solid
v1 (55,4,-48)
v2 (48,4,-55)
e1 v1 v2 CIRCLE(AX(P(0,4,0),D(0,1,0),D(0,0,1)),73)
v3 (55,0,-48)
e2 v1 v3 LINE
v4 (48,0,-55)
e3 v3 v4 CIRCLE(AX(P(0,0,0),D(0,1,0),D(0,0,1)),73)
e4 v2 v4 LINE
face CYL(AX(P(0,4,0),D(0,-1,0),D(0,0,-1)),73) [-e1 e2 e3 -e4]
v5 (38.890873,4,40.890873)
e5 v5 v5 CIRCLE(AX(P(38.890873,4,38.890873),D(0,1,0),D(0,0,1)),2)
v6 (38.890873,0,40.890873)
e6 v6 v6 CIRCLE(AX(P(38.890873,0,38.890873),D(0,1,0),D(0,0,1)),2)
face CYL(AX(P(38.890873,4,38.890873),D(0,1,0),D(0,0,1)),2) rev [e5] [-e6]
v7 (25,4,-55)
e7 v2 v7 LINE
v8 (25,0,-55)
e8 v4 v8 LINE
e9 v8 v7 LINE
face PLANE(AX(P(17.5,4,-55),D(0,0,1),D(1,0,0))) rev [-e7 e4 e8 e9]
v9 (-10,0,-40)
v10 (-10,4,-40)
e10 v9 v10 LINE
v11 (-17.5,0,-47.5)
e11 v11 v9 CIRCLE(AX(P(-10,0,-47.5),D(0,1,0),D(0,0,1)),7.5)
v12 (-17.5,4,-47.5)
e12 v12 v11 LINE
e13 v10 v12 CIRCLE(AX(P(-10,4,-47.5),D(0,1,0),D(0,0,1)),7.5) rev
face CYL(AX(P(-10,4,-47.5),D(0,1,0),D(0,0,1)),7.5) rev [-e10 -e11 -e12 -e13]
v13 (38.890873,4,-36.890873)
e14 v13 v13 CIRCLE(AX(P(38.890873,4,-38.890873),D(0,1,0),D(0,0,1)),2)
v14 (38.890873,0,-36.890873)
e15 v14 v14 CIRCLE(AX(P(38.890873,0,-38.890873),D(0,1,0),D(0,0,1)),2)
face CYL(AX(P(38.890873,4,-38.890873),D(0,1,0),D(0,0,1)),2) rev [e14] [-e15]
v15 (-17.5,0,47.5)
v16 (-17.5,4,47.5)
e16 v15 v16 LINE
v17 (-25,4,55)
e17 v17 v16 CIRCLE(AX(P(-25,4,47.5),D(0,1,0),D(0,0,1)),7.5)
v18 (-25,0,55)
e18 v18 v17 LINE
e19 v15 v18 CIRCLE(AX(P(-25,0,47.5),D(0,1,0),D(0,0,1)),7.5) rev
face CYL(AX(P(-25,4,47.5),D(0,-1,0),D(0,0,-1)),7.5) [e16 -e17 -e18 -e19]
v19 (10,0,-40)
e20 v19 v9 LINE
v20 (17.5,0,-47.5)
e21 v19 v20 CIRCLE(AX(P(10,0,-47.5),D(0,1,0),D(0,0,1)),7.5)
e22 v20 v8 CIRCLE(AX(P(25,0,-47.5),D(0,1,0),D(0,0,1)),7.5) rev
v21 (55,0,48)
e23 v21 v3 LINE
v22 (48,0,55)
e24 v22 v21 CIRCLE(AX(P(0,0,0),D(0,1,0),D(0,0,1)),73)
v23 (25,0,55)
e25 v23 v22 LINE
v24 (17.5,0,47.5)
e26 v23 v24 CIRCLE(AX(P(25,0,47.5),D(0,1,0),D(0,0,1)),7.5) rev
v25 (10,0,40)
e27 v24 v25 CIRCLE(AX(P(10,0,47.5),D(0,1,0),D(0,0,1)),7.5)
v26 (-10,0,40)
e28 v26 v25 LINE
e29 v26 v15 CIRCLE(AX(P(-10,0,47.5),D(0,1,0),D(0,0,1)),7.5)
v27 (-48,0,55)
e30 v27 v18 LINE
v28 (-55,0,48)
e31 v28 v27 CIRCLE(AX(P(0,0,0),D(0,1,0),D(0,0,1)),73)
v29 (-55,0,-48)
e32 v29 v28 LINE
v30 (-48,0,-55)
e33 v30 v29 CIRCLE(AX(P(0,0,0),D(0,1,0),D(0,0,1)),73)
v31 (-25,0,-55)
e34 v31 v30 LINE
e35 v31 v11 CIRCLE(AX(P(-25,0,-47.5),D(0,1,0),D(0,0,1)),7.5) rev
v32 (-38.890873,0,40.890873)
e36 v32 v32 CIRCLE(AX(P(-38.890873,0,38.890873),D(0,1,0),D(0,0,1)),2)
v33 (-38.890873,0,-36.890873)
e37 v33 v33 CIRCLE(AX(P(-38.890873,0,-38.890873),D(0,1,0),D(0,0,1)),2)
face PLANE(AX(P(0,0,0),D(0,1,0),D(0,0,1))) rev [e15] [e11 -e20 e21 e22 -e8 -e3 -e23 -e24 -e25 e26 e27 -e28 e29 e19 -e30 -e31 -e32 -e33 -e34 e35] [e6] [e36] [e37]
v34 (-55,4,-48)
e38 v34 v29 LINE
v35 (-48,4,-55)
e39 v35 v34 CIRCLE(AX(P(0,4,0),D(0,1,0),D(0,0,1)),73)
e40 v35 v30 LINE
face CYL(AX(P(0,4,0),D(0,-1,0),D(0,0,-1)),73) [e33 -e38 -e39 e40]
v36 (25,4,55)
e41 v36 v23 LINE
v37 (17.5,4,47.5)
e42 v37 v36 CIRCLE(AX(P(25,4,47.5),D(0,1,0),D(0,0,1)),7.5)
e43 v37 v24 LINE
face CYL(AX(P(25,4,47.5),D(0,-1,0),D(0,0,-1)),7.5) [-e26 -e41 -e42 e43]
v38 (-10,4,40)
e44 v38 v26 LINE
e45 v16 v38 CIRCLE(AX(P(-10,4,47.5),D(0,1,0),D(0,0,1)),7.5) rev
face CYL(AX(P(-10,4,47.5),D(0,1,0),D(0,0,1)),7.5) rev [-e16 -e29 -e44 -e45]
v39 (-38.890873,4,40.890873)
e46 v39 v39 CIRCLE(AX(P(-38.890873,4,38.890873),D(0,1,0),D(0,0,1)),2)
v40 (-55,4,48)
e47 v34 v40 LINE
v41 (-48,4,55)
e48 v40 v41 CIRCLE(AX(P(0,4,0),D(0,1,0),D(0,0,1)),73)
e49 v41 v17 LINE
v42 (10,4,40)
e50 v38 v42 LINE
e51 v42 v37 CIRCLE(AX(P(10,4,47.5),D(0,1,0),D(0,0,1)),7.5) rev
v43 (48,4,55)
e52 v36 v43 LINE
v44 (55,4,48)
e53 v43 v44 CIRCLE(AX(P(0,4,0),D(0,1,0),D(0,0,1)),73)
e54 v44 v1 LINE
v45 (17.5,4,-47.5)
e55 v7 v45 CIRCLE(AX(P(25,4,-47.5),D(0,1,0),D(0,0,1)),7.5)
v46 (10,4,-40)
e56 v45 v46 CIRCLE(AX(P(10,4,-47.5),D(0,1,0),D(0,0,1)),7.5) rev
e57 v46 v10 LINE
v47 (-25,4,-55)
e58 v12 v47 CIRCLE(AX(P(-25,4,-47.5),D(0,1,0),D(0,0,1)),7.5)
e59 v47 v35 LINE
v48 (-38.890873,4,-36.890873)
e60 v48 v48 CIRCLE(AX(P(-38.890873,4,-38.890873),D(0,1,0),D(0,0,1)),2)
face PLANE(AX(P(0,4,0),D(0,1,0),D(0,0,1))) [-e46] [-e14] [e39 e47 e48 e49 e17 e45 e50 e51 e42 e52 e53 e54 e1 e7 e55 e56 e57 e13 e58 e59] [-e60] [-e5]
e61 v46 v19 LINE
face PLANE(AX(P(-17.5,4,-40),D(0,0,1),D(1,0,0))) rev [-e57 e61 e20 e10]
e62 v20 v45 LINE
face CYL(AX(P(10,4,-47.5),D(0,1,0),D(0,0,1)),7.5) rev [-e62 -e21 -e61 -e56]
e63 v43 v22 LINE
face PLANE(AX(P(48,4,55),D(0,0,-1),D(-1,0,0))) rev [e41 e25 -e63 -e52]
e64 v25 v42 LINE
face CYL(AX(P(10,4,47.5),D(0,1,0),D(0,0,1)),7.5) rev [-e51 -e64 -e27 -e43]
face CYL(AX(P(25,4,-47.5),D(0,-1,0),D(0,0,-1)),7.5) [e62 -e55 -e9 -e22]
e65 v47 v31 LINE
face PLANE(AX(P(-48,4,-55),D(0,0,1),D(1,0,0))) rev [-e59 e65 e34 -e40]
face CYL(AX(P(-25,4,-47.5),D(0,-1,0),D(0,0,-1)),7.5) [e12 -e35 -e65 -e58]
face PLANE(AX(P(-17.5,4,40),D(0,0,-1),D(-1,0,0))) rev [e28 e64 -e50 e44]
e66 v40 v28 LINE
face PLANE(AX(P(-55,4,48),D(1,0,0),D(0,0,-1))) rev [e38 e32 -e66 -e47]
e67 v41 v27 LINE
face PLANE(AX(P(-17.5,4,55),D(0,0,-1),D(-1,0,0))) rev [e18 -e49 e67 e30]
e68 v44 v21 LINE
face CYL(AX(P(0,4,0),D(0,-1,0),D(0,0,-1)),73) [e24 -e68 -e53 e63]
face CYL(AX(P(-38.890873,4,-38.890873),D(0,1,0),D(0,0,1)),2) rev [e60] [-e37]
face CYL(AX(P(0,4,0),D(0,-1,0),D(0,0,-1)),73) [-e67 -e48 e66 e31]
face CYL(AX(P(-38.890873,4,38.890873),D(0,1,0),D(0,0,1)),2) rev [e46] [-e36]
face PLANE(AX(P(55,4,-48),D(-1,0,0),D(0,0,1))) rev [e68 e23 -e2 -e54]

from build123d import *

# Parameters (mm, degrees)
BOSS_EXTRUDE1_DEPTH   = 4
F_4_0MM_DOWEL_HOLE2_D = 4
FILLET1_START         = -1
FILLET1_DEPTH         = 6
FILLET1_2_DEPTH       = 4


with BuildPart() as part:
    # Sketch1 → Boss-Extrude1 (new body)
    with BuildSketch(Plane(origin=(0, 0, 0), x_dir=(1, 0, 0), z_dir=(0, 1, 0))):
        with BuildLine():
            Line((55, 48), (55, -48))
            ThreePointArc((55, -48), (51.618795027, -51.618795027), (48, -55))
            Line((48, -55), (17.5, -55))
            Line((17.5, -55), (17.5, -40))
            Line((17.5, -40), (-17.5, -40))
            Line((-17.5, -40), (-17.5, -55))
            Line((-17.5, -55), (-48, -55))
            ThreePointArc((-48, -55), (-51.618795027, -51.618795027), (-55, -48))
            Line((-55, -48), (-55, 48))
            ThreePointArc((-55, 48), (-51.618795027, 51.618795027), (-48, 55))
            Line((-48, 55), (-17.5, 55))
            Line((-17.5, 55), (-17.5, 40))
            Line((-17.5, 40), (17.5, 40))
            Line((17.5, 40), (17.5, 55))
            Line((17.5, 55), (48, 55))
            ThreePointArc((48, 55), (51.618795027, 51.618795027), (55, 48))
        make_face()
    extrude(amount=BOSS_EXTRUDE1_DEPTH)

    # Ø4.0mm Dowel Hole2 (through all)
    with Locations(Plane(origin=(0, 4, 0), x_dir=(1, 0, 0), z_dir=(0, 1, 0))):
        with Locations((38.890872965, 38.890872965), (38.890872965, -38.890872965), (-38.890872965, -38.890872965), (-38.890872965, 38.890872965)):
            Hole(F_4_0MM_DOWEL_HOLE2_D / 2)

    # Fillet1: read off the stored shape, not the designer's step
    # Fillet1 outline → Fillet1 (cut)
    with BuildSketch(Plane(origin=(0, 0, 0), x_dir=(1, 0, 0), z_dir=(0, 1, 0)).offset(FILLET1_START)):
        with BuildLine():
            Line((17.5, 55), (17.5, 47.5))
            ThreePointArc((17.5, 47.5), (19.696699141, 52.803300859), (25, 55))
            Line((25, 55), (17.5, 55))
        make_face()
        with BuildLine():
            ThreePointArc((-25, 55), (-19.696699141, 52.803300859), (-17.5, 47.5))
            Line((-17.5, 47.5), (-17.5, 55))
            Line((-17.5, 55), (-25, 55))
        make_face()
        with BuildLine():
            Line((-17.5, -55), (-17.5, -47.5))
            ThreePointArc((-17.5, -47.5), (-19.696699141, -52.803300859), (-25, -55))
            Line((-25, -55), (-17.5, -55))
        make_face()
        with BuildLine():
            ThreePointArc((25, -55), (19.696699141, -52.803300859), (17.5, -47.5))
            Line((17.5, -47.5), (17.5, -55))
            Line((17.5, -55), (25, -55))
        make_face()
    extrude(amount=FILLET1_DEPTH, mode=Mode.SUBTRACT)

    # Fillet1 2 outline → Fillet1 2 (add)
    with BuildSketch(Plane(origin=(0, 0, 0), x_dir=(1, 0, 0), z_dir=(0, 1, 0))):
        with BuildLine():
            Line((-17.5, 40), (-10, 40))
            ThreePointArc((-10, 40), (-15.303300859, 42.196699141), (-17.5, 47.5))
            Line((-17.5, 47.5), (-17.5, 40))
        make_face()
        with BuildLine():
            ThreePointArc((17.5, 47.5), (15.303300859, 42.196699141), (10, 40))
            Line((10, 40), (17.5, 40))
            Line((17.5, 40), (17.5, 47.5))
        make_face()
        with BuildLine():
            Line((17.5, -40), (10, -40))
            ThreePointArc((10, -40), (15.303300859, -42.196699141), (17.5, -47.5))
            Line((17.5, -47.5), (17.5, -40))
        make_face()
        with BuildLine():
            ThreePointArc((-17.5, -47.5), (-15.303300859, -42.196699141), (-10, -40))
            Line((-10, -40), (-17.5, -40))
            Line((-17.5, -40), (-17.5, -47.5))
        make_face()
    extrude(amount=FILLET1_2_DEPTH)


solid = part.part
